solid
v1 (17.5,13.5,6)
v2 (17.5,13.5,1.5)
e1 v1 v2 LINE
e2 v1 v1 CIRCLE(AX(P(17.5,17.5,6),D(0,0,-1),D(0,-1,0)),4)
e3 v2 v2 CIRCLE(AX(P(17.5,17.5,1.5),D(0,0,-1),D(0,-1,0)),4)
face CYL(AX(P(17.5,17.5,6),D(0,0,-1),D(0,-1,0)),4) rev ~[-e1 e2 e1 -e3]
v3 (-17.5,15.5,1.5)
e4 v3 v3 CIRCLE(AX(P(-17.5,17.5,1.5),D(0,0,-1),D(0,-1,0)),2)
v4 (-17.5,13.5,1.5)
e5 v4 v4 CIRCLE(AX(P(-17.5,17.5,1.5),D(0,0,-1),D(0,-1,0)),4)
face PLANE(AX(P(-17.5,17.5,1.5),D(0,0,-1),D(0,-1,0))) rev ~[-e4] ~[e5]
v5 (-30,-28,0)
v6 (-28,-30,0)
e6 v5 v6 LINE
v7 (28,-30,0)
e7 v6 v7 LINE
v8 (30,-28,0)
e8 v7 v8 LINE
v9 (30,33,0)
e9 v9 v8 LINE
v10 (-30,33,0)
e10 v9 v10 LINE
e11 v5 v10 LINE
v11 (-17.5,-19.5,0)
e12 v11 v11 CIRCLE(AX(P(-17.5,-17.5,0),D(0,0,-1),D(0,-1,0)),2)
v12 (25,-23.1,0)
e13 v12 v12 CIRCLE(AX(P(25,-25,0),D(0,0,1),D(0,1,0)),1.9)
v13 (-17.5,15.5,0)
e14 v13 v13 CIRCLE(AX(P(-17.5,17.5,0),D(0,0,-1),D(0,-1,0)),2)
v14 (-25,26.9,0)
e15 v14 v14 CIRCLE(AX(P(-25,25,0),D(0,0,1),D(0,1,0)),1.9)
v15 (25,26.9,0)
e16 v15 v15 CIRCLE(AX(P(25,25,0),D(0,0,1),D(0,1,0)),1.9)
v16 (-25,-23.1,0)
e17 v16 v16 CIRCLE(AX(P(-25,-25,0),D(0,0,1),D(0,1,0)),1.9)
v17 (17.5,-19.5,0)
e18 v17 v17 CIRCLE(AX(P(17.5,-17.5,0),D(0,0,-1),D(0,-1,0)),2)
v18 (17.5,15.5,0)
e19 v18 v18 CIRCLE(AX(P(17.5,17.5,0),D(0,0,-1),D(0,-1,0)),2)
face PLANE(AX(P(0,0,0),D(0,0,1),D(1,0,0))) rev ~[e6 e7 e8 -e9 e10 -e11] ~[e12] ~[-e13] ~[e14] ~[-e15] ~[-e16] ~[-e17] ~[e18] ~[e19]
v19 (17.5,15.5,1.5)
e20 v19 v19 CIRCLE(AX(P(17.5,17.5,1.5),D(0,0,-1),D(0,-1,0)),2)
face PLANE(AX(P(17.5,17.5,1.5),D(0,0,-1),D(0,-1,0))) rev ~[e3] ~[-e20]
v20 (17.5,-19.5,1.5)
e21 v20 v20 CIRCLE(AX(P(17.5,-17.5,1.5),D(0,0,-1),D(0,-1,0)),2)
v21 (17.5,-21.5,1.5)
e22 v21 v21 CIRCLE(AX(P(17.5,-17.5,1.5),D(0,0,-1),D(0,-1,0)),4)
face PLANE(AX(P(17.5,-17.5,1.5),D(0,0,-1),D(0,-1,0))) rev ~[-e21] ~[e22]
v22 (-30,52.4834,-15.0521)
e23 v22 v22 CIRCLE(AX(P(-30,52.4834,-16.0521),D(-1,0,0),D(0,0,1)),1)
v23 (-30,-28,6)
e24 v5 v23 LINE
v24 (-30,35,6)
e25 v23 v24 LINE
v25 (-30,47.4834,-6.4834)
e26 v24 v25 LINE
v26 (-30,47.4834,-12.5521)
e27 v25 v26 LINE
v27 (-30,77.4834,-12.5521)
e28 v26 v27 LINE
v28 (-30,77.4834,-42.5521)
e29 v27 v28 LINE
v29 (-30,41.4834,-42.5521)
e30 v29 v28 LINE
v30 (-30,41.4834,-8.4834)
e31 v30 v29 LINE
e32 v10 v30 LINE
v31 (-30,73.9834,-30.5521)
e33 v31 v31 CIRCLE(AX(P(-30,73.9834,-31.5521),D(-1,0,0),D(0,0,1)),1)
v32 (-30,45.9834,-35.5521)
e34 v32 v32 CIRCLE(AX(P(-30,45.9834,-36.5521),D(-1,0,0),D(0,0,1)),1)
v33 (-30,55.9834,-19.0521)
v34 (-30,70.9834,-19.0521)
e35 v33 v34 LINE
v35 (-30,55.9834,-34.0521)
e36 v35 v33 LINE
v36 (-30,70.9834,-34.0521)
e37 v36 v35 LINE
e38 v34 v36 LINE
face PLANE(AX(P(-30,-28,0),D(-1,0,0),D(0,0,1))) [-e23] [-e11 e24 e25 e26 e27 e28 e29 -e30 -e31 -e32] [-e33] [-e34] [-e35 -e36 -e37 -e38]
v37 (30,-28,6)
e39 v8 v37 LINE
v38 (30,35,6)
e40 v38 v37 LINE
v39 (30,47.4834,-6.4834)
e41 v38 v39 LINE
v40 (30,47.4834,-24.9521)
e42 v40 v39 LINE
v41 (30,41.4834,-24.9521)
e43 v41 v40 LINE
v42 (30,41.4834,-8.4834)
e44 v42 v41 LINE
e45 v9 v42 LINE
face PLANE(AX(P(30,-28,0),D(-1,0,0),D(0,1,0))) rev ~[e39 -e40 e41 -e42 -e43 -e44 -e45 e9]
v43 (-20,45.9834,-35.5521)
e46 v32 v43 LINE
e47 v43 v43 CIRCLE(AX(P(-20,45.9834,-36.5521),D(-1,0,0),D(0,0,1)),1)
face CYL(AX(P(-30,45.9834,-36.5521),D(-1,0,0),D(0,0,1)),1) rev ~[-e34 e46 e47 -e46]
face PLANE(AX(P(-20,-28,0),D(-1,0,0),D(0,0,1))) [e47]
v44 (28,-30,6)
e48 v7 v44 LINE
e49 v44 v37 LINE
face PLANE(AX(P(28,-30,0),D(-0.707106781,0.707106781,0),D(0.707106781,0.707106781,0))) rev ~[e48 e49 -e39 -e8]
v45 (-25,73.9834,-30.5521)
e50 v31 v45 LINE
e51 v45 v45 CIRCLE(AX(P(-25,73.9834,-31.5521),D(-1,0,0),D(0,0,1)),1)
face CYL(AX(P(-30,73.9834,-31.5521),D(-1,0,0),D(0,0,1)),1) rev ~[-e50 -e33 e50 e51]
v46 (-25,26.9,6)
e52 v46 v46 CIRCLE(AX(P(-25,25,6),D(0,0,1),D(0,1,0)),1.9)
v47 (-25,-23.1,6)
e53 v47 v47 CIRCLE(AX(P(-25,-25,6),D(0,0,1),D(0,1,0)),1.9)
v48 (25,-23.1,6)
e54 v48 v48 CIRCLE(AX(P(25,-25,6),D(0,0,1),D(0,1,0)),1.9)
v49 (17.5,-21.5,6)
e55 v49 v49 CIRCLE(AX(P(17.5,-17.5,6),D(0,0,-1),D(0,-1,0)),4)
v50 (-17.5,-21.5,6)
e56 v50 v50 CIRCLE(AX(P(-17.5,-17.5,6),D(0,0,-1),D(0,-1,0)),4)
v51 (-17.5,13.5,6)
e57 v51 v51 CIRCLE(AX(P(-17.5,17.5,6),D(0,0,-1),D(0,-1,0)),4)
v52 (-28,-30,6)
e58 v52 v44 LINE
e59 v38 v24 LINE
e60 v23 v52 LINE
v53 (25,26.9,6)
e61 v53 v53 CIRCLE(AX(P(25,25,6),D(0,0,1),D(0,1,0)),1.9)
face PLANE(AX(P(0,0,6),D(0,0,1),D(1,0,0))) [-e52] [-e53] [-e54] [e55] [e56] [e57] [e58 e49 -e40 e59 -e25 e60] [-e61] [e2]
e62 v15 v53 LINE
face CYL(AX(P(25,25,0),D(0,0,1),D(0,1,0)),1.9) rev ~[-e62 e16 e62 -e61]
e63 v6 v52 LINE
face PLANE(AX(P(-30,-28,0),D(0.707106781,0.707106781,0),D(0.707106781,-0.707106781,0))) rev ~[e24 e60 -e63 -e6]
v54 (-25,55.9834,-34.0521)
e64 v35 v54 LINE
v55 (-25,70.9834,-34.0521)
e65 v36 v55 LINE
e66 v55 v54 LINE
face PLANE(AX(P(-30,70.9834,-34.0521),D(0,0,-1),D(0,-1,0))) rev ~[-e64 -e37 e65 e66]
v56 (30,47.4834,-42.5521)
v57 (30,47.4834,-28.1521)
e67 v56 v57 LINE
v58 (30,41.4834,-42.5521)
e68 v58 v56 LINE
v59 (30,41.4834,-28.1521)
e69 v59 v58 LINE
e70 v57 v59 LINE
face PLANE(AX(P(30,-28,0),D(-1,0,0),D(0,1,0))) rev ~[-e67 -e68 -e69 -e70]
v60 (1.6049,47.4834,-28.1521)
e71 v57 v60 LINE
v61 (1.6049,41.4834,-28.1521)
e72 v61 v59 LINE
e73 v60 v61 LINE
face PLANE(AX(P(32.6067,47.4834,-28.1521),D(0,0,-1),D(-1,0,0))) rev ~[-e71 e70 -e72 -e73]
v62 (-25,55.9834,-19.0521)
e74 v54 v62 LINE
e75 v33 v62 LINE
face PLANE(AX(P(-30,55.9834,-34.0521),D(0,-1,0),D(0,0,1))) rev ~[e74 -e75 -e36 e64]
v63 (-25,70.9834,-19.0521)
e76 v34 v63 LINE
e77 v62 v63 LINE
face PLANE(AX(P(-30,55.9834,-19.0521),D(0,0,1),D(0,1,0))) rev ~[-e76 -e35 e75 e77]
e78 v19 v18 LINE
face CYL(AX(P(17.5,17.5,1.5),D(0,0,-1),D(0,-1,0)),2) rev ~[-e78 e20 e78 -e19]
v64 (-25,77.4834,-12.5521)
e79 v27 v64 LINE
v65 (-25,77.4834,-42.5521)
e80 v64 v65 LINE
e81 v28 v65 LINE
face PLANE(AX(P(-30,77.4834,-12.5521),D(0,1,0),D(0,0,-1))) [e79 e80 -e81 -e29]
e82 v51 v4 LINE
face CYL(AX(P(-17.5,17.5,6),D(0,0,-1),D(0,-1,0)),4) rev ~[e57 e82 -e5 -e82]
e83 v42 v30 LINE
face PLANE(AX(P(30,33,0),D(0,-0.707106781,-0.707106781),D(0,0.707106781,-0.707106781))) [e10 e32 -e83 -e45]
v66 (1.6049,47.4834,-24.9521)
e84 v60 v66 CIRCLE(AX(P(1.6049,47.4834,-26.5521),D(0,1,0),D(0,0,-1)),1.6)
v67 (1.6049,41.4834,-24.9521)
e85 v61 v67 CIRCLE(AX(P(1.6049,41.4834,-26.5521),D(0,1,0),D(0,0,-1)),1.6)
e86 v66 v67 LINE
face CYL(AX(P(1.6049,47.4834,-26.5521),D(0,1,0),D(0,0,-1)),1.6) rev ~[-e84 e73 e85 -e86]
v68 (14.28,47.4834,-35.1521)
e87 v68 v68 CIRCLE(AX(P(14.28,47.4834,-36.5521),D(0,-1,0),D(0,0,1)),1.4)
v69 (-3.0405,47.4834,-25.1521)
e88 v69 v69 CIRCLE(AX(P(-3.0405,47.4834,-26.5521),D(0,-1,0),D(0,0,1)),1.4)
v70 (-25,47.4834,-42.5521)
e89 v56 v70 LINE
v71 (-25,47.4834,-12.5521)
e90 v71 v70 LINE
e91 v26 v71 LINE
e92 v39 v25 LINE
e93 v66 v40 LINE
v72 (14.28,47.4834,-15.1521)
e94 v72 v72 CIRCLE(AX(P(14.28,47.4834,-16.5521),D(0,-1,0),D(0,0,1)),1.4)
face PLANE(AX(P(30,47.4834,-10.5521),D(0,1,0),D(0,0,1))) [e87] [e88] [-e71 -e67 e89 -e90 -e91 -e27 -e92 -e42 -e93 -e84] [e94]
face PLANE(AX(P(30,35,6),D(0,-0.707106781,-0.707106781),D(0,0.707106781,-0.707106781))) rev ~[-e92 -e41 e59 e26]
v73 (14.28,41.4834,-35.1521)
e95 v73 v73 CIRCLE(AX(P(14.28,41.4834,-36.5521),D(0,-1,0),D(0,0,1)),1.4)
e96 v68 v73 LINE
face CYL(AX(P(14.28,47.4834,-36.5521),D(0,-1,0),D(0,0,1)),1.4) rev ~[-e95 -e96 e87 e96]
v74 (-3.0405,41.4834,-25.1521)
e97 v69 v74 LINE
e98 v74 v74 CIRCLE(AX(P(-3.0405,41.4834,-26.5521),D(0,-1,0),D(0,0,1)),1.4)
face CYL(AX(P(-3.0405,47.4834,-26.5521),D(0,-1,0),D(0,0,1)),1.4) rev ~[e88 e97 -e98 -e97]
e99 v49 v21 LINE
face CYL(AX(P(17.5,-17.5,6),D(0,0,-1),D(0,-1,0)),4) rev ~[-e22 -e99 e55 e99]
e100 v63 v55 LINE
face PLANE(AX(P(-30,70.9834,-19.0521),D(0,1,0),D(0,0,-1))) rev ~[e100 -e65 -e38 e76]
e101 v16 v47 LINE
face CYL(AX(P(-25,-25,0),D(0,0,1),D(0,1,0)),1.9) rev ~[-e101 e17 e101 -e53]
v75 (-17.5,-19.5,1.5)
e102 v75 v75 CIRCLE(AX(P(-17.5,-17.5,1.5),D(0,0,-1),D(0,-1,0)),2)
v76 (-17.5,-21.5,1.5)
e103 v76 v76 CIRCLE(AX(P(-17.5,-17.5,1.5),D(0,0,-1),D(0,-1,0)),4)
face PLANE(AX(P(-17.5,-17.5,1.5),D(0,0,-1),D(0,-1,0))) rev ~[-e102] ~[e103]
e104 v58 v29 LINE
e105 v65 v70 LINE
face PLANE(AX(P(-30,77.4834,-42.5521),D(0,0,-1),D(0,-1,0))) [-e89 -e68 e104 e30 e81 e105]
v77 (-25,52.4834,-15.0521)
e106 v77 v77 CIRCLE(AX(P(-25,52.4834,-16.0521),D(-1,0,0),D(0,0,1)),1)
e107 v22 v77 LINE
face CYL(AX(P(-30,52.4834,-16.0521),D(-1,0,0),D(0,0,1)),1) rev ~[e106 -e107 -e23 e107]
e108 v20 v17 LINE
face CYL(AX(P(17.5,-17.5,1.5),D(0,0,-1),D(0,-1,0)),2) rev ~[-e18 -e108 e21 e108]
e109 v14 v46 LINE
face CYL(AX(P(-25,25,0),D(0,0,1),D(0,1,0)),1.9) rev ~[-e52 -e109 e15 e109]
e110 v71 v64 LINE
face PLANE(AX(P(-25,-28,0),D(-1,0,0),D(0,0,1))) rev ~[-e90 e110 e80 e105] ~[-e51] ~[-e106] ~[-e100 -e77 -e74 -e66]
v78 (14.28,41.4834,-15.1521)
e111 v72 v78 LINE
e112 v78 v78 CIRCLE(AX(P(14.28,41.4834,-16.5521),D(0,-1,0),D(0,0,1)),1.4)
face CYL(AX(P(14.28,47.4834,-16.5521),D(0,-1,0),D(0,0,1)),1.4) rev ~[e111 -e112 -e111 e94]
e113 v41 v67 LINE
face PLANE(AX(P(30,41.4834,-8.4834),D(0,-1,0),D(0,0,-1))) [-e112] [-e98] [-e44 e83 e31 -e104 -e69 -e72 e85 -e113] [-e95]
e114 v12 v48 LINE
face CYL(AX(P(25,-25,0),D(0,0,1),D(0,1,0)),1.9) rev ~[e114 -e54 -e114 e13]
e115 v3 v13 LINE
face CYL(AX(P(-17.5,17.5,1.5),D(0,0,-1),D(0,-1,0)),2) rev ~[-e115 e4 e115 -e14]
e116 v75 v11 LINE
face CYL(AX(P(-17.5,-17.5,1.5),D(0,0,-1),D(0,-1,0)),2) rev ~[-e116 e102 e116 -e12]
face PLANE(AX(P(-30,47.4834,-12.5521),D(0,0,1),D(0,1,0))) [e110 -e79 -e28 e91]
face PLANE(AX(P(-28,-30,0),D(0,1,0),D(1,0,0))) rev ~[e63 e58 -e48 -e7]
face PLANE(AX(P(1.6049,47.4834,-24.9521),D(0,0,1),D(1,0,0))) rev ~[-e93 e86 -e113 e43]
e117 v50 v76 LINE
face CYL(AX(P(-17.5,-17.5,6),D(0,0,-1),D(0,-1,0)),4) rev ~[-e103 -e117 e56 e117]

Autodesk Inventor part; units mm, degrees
ref_plane "YZ Plane" through (0, 0, 0) normal (1, 0, 0) x (0, 1, 0)
ref_plane "XZ Plane" through (0, 0, 0) normal (0, 1, 0) x (-1, 0, 0)
ref_plane "Work Plane1" through (0, 0, 0) normal (0, 0, 1) x (1, 0, 0)
ref_plane "Work Plane2" through (-30, -30, 6) normal (0, 0, -1) x (0, 1, 0)
sketch "Sketch1" plane through (0, 0, 0) normal (0, 0, 1) x (1, 0, 0)
  circle A0 centre (-25, 0) radius 1.95 projected
  circle A1 centre (0, -25) radius 1.95 projected
  circle A2 centre (25, -25) radius 1.95 projected
  circle A3 centre (-25, 25) radius 1.95 projected
  circle A4 centre (25, 25) radius 1.95 projected
  circle A5 centre (-25, -25) radius 1.95 projected
  circle A6 centre (0, 25) radius 1.95 projected
  circle A7 centre (25, 0) radius 1.95 projected
  line L0 (-30, -28) -> (-28, -30) projected
  line L1 (-28, -30) -> (28, -30) projected
  line L2 (28, -30) -> (30, -28) projected
  line L3 (30, -28) -> (30, 28) projected
  line L4 (30, 28) -> (28, 30) projected
  line L5 (28, 30) -> (-28, 30) projected
  line L6 (-28, 30) -> (-30, 28) projected
  line L7 (-30, 28) -> (-30, -28) projected
  line L8 (43, -44) -> (44, -44) projected
  line L9 (76, -44) -> (145, -44) construction
  point P0 (0, 0)
  point P1 (30, 25)
extrude "Extrusion1" add sketch "Sketch1" along normal up to surface (6 mm away) contours A0 | A1 | A2 | A3 | A4 | A5 | A6 | A7 | L7 L6 L5 L4 L3 L2 L1 L0
sketch "Sketch2" plane through (-28, 30, 6) normal (0, 0, 1) x (1, 0, 0)
  circle A0 centre (10.5, -12.5) radius 1.95 projected
  circle A1 centre (10.5, -47.5) radius 1.95 projected
  circle A2 centre (45.5, -47.5) radius 1.95 projected
  circle A3 centre (45.5, -12.5) radius 1.95 projected
  point P0 (28, -30)
hole "Hole1" at (-17.5, -17.5, 6) at (17.5, -17.5, 6) at (17.5, 17.5, 6) at (-17.5, 17.5, 6) direction (0, 0, -1) diameter 4 end through all counterbore diameter 8 counterbore depth 4.5
sketch "Sketch10" plane through (0, 0, 0) normal (0, 0, -1) x (-1, 0, 0)
  circle A0 centre (-25, 25) radius 2.325 projected
  circle A1 centre (-25, -25) radius 2.325 projected
  circle A2 centre (25, 25) radius 2.325 projected
  circle A3 centre (25, -25) radius 2.325 projected
  circle A4 centre (25, -25) radius 2.325 projected
  point P0 (0, 0)
hole "Hole3" at (-25, 25, 0) at (25, 25, 0) at (-25, -25, 0) at (25, -25, 0) direction (0, 0, 1) diameter 3.8 depth 20 tip angle 118
sketch "Skizze13" plane through (30, -28, 0) normal (1, 0, 0) x (0, 0, -1)
  line L0 (0, 56) -> (-6, 56) projected
  line L1 (-6, 56) -> (-6, 58) projected
  line L2 (0, 56) -> (0, 58) projected
  line L3 (0, 58) -> (-6, 58) projected
  line L4 (-6, 58) -> (-6, 63)
  line L5 (-6, 63) -> (6.4834, 75.4834)
  line L6 (10.5521, 75.4834) -> (12.5521, 75.4834)
  line L7 (0, 58) -> (0, 61)
  line L8 (0, 61) -> (8.4834, 69.4834)
  line L9 (8.4834, 69.4834) -> (42.5521, 69.4834)
  line L10 (42.5521, 69.4834) -> (42.5521, 75.4834)
  line L11 (42.5521, 75.4834) -> (6.4834, 75.4834)
  line L12 (42.5521, 75.4834) -> (42.5521, 107.4834)
  point P0 (0, 28)
  dimension "d43" = 5
  dimension "d44" = 135
  dimension "d45" = 135
  dimension "d46" = 0
  dimension "d49" = 6
extrude "Extrusion10" add sketch "Skizze13" against normal up to surface (60 mm away)
ref_plane "Arbeitsebene4" through (-30, 57.7593, -26.2973) normal (1, 0, 0) x (0, -0.9086751, 0.417504)
sketch "Skizze14" plane through (-30, -28, 0) normal (-1, 0, 0) x (0, 0, 1)
  circle A0 centre (-16.0521, 80.4834) radius 1
  circle A1 centre (-31.5521, 101.9834) radius 1
  circle A2 centre (-36.5521, 73.9834) radius 1
  line L0 (-6.4834, 75.4834) -> (-42.5521, 75.4834) projected
  line L1 (-42.5521, 69.4834) -> (-42.5521, 75.4834) projected
  line L2 (-42.5521, 75.4834) -> (-12.5521, 75.4834)
  line L3 (-12.5521, 75.4834) -> (-12.5521, 105.4834)
  line L4 (-12.5521, 105.4834) -> (-42.5521, 105.4834)
  line L5 (-42.5521, 105.4834) -> (-42.5521, 75.4834)
  circle A3 centre (-26.5521, 91.4834) radius 2.6486
  line L6 (-34.0521, 83.9834) -> (-19.0521, 83.9834)
  line L7 (-19.0521, 83.9834) -> (-19.0521, 98.9834)
  line L8 (-19.0521, 98.9834) -> (-34.0521, 98.9834)
  line L9 (-34.0521, 98.9834) -> (-34.0521, 83.9834)
  line L10 (-34.0521, 83.9834) -> (-19.0521, 98.9834) construction
  line L11 (-19.0521, 83.9834) -> (-34.0521, 98.9834) construction
  point P0 (0, 28)
  point P1 (-12.5521, 75.4834)
  dimension "d50" = 30
  dimension "d51" = 30
  dimension "d52" = 15
  dimension "d53" = 15
extrude "Extrusion11" add sketch "Skizze14" against normal blind 5 contours L0 L5 L4 L3
sketch "Skizze15" plane through (30, 47.4834, -6.4834) normal (0, 1, 0) x (1, 0, 0)
  circle A0 centre (-15, 20.0687) radius 1.4
  line L0 (2.6067, 20.0687) -> (-28.3951, 20.0687) construction
  line L1 (2.6067, 21.6687) -> (-28.3951, 21.6687)
  line L2 (-28.3951, 18.4687) -> (2.6067, 18.4687)
  arc A1 (2.6067, 18.4687) -> (2.6067, 21.6687) centre (2.6067, 20.0687) ccw
  arc A2 (-28.3951, 21.6687) -> (-28.3951, 18.4687) centre (-28.3951, 20.0687) ccw
  point P0 (-30, -6.4834)
  point P1 (-12.8942, 20.0687)
  dimension "d56" = 3.2
extrude "Extrusion12" cut sketch "Skizze15" against normal through all contours A0 | A1 L2 A2 L1
sketch "Skizze16" plane through (-30, -28, 0) normal (-1, 0, 0) x (0, 0, 1)
  circle A0 centre (-16.0521, 80.4834) radius 1
  circle A1 centre (-31.5521, 101.9834) radius 1
  circle A2 centre (-36.5521, 73.9834) radius 1
  point P0 (0, 28)
extrude "Extrusion13" cut sketch "Skizze16" against normal blind 10
sketch "Skizze17" plane through (-30, 47.4834, -6.4834) normal (0, 1, 0) x (1, 0, 0)
  arc A0 (31.6049, 21.6687) -> (31.6049, 18.4687) centre (31.6049, 20.0687) ccw projected
  line L0 (44.28, 10.0687) -> (26.9595, 20.0687)
  line L1 (26.9595, 20.0687) -> (44.28, 30.0687)
  line L2 (44.28, 30.0687) -> (44.28, 10.0687)
  line L3 (0, 6.0687) -> (0, 36.0687) projected
  point P0 (30, -6.4834)
  point P1 (38.5065, 20.0687)
  dimension "d61" = 20
hole "Bohrung4" at (14.28, 47.4834, -16.5521) at (-3.0405, 47.4834, -26.5521) at (14.28, 47.4834, -36.5521) direction (0, -1, 0) diameter 2.8 depth 20 tip angle 118
properties part number "cellSTORM_v5_laserstage"
